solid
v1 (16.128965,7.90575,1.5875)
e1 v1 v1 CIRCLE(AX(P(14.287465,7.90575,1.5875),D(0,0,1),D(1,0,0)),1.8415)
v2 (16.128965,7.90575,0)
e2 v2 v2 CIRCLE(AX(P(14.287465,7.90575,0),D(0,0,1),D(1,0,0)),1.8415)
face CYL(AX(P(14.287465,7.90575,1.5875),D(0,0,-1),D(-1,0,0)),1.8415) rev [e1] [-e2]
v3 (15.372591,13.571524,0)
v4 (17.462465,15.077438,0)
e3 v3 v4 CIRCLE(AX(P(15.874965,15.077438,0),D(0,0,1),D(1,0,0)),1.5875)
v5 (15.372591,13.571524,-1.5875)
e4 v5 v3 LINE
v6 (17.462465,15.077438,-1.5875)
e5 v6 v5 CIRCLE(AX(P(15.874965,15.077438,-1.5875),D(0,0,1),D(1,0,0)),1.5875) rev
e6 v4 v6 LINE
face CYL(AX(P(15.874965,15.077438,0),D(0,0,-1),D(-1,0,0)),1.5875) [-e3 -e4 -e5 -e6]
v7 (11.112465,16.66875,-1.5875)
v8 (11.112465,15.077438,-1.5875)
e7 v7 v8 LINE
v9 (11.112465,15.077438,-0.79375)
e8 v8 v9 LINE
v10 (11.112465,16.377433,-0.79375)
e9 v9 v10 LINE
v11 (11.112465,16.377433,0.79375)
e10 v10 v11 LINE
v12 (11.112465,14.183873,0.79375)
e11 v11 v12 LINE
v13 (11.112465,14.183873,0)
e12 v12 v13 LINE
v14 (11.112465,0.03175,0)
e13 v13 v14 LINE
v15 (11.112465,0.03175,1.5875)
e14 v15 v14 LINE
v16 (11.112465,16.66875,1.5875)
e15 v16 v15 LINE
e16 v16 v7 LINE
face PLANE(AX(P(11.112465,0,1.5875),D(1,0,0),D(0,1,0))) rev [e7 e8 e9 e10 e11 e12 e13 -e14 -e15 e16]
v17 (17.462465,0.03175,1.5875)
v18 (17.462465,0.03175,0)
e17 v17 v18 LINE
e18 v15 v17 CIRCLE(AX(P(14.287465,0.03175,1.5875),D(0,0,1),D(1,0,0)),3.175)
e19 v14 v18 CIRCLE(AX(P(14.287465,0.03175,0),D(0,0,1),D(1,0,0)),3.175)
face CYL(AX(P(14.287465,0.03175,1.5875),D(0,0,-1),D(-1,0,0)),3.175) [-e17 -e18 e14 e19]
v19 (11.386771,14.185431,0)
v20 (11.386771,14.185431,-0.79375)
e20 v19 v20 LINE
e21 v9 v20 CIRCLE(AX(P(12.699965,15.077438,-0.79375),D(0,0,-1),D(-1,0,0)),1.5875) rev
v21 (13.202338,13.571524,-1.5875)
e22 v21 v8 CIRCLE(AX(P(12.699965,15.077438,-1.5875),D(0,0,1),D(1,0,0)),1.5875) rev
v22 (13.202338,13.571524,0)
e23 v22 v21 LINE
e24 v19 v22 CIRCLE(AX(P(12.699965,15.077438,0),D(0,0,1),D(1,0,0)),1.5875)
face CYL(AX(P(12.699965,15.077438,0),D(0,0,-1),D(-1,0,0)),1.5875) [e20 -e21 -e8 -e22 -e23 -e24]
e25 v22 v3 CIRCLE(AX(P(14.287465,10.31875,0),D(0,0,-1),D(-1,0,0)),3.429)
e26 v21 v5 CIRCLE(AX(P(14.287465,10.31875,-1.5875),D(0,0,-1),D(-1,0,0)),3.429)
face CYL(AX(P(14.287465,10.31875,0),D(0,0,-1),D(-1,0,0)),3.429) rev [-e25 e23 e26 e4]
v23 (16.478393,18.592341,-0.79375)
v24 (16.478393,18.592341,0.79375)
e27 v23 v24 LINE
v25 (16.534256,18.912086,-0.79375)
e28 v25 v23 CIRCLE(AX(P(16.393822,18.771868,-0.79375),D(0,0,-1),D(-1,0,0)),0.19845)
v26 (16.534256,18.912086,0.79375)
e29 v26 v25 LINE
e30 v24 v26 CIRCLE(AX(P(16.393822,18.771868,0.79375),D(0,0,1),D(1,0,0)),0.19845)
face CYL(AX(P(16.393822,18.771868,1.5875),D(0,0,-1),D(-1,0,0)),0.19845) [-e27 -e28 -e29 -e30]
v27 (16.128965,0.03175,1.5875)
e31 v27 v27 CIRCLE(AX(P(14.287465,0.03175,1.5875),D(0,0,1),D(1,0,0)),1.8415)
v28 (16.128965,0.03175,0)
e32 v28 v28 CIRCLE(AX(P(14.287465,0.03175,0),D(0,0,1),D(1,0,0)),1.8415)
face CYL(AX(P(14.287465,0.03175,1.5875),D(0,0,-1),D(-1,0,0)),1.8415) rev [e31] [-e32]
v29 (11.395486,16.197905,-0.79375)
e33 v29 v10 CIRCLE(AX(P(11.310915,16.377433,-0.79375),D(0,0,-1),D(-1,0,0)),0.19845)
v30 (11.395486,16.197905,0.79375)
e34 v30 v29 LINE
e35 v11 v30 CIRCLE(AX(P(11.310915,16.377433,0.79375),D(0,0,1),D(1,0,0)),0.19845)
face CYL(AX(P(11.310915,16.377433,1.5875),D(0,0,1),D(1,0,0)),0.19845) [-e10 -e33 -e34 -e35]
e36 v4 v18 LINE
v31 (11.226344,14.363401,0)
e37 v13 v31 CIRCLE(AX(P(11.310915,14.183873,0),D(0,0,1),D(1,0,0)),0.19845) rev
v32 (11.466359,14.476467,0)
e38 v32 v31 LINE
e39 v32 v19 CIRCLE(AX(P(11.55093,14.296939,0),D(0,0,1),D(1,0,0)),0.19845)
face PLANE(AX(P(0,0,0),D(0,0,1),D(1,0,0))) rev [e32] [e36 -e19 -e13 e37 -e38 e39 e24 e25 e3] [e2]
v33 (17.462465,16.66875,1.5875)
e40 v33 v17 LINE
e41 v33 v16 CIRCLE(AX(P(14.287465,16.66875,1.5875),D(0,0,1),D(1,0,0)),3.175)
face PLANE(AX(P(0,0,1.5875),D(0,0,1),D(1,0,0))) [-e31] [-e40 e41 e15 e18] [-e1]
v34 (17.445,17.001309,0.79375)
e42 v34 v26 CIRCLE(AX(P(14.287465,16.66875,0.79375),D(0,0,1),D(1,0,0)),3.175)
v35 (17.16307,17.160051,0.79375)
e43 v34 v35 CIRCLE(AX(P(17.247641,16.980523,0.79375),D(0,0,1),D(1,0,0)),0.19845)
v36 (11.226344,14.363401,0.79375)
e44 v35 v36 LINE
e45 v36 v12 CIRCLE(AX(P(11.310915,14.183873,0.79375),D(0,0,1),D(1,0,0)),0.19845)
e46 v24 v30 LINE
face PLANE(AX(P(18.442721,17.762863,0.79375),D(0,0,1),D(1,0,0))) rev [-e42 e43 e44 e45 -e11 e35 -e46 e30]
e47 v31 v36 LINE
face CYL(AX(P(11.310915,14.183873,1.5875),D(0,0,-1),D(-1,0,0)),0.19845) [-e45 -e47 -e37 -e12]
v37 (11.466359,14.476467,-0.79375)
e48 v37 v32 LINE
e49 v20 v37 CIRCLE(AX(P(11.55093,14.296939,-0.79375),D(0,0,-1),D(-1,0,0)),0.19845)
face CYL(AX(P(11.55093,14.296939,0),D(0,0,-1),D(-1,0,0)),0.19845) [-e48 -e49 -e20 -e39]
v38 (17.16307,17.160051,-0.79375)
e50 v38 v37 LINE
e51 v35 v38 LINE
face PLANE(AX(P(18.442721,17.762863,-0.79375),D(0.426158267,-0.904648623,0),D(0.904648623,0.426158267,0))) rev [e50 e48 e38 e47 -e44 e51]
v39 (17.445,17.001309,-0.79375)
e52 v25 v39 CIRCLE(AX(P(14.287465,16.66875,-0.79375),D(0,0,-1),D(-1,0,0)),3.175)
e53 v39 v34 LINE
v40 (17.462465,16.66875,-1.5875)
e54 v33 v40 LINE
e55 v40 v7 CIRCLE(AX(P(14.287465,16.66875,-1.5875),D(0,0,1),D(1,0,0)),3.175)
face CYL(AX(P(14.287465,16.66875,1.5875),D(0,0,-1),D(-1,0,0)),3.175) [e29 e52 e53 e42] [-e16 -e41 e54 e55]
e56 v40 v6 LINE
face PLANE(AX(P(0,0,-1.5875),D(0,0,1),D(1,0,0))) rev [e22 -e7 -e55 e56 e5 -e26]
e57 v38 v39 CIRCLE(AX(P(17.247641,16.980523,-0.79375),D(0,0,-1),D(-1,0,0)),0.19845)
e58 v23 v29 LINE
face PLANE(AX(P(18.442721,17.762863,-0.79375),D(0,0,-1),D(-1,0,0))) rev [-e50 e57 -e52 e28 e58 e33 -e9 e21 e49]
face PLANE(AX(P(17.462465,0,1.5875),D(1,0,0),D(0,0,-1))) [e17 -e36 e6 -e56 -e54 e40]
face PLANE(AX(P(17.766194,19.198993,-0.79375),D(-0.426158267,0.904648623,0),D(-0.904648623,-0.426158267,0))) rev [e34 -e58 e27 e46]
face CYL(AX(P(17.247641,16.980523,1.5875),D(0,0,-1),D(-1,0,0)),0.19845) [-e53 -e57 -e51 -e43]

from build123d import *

# Parameters (mm, degrees)
SKETCH3_R               = 1.8414999999999992
SKETCH3_R_2             = 1.8415000000000015
BOSS_EXTRUDE1_DEPTH     = 1.5875
BOSS_EXTRUDE2_START     = -1.5875
SKETCH3_3_R             = 3.1750000000000016
BOSS_EXTRUDE2_DEPTH     = 1.5875
CUT_EXTRUDE1_DEPTH      = 1.5875
CUT_EXTRUDE3_DEPTH      = 14.458066723062892
CUT_EXTRUDE3_DEPTH_BACK = 14.458066723062892
SKETCH9_W               = 1.5874999999999995
SKETCH9_H               = 1.5875000000000021
FILLET1_R               = 1.5875
FILLET3_R               = 0.19845020000000002


with BuildPart() as part:
    # Sketch3 → Boss-Extrude1 (new body)
    with BuildSketch(Plane.XY):
        with BuildLine():
            ThreePointArc((11.11246472217867, 0.03175000000000093), (14.287464722178669, -3.1432499999999988), (17.46246472217867, 0.03174999999999976))
            Line((17.46246472217867, 0.03175000000000054), (17.46246472217867, 16.668750000000003))
            ThreePointArc((17.46246472217867, 16.668750000000003), (14.287464722178667, 19.843750000000004), (11.112464722178665, 16.668750000000003))
            Line((11.112464722178666, 16.668750000000003), (11.11246472217867, 0.03174999999999883))
        make_face()
        with Locations((14.287464722178665, 7.905750000000001)):
            Circle(SKETCH3_R, mode=Mode.SUBTRACT)
        with Locations((14.287464722178669, 0.03175000000000054)):
            Circle(SKETCH3_R_2, mode=Mode.SUBTRACT)
    extrude(amount=BOSS_EXTRUDE1_DEPTH)

    # Sketch3<3> → Boss-Extrude2 (add)
    with BuildSketch(Plane.XY.offset(BOSS_EXTRUDE2_START)):
        with BuildLine():
            Line((14.287464727919362, 13.493750000000004), (17.46246472217867, 13.493750000000004))
            Line((17.46246472217867, 13.493750000000004), (17.46246472217867, 16.668750000000003))
            ThreePointArc((17.46246472217867, 16.668750000000003), (16.5325287544756, 14.423685971762355), (14.287464727919362, 13.493750000000002))
        make_face()
        with BuildLine():
            Line((11.11246472217867, 13.493750000000004), (14.287464727919362, 13.493750000000004))
            ThreePointArc((14.287464727919362, 13.493750000000002), (12.042400693941019, 14.423685967703072), (11.112464722178665, 16.668750000000003))
            Line((11.112464722178666, 16.668750000000003), (11.11246472217867, 13.493750000000004))
        make_face()
        with Locations((14.287464722178667, 16.668750000000003)):
            Circle(SKETCH3_3_R)
        with BuildLine():
            ThreePointArc((11.112464722178665, 10.318750009292732), (12.042400697226496, 12.56381403558241), (14.287464727919362, 13.493750000000002))
            Line((14.287464727919362, 13.493750000000004), (11.11246472217867, 13.493750000000004))
            Line((11.11246472217867, 13.493750000000004), (11.11246472217867, 10.318750009292732))
        make_face()
        with BuildLine():
            ThreePointArc((14.287464727919362, 13.493750000000002), (16.532528754475596, 12.563814028237648), (17.462464722178666, 10.318750000000003))
            Line((17.46246472217867, 10.318750000000003), (17.46246472217867, 13.493750000000004))
            Line((17.46246472217867, 13.493750000000004), (14.287464727919362, 13.493750000000004))
        make_face()
    extrude(amount=BOSS_EXTRUDE2_DEPTH)

    # Sketch4 → Cut-Extrude1 (cut)
    with BuildSketch(Plane(origin=(0, 0, -1.5875), x_dir=(-1, 0, 0), z_dir=(0, 0, -1))):
        with BuildLine():
            ThreePointArc((-11.366464722178668, 12.114801224213839), (-14.28746472217867, 13.747750000000003), (-17.208464722178668, 12.11480122421383))
            ThreePointArc((-17.208464722178668, 12.11480122421383), (-17.345736990888724, 11.869560023967814), (-17.4624647221787, 11.613900956452488))
            Line((-17.46246472217867, 11.613900956452483), (-17.46246472217867, 10.318750000000003))
            ThreePointArc((-17.46246472217867, 10.318750000000005), (-14.287464722178669, 13.493750000000002), (-11.112464722178668, 10.318750000000003))
            Line((-11.112464722178666, 10.318750000000003), (-11.112464722178666, 11.613900956452593))
            ThreePointArc((-11.112464722178673, 11.613900956452591), (-11.229192453468636, 11.86956002396787), (-11.366464722178668, 12.114801224213839))
        make_face()
        with BuildLine():
            Line((-17.46246472217867, 10.318750000000003), (-17.46246472217867, 11.613900956452483))
            ThreePointArc((-17.4624647221787, 11.613900956452488), (-14.947376079862362, 6.9538491099290844), (-10.858464722178665, 10.318750000000003))
            ThreePointArc((-10.858464722178665, 10.318750000000003), (-10.922563832107757, 10.978661357683757), (-11.112464722178673, 11.613900956452591))
            Line((-11.112464722178666, 11.613900956452593), (-11.112464722178666, 10.318750000000003))
            ThreePointArc((-11.112464722178668, 10.318750000000003), (-14.287464722178669, 13.493750000000002), (-17.46246472217867, 10.318750000000005))
        make_face()
    extrude(amount=-CUT_EXTRUDE1_DEPTH, mode=Mode.SUBTRACT)

    # Sketch9 → Cut-Extrude3 (cut, two sides: drawn at the far end of the back side and taken through both)
    with BuildSketch(Plane(origin=(14.949330355898779, 7.042270953374606, 0), x_dir=(0, 0, 1), z_dir=(-0.9046486230783365, -0.42615826726988393, 0)).offset(-CUT_EXTRUDE3_DEPTH_BACK)):
        with Locations((-1.1e-16, 9.003381908558007)):
            Rectangle(SKETCH9_W, SKETCH9_H)
    extrude(amount=CUT_EXTRUDE3_DEPTH + CUT_EXTRUDE3_DEPTH_BACK, mode=Mode.SUBTRACT)

    # Fillet1
    # the kernel refuses this fillet: 1.5875 mm, written as the material it takes off along each edge
    with BuildSketch(Plane(origin=(11.112464722178668, 11.613900956452579, 0), x_dir=(-5.1e-16, 1, 0), z_dir=(0, 0, -1))) as fillet1_piece_1:
        with BuildLine():
            CenterArc((3.463537518327043, 1.5875000000000004), FILLET1_R, 161.5512847696779, 108.44871523032214)
            ThreePointArc((1.9576234440297167, 2.0898734177215426), (1.2074075320922062, 0.8308067461464439), (0, 0))
            Line((0, 0), (3.463537518327044, 0))
        make_face()
    extrude(amount=10.24634379581761, mode=Mode.SUBTRACT)
    with BuildSketch(Plane(origin=(17.46246472217867, 11.613900956453127, 0), x_dir=(0, 1, 0), z_dir=(0, 0, -1))) as fillet1_piece_2:
        with BuildLine():
            CenterArc((3.4635375183265698, -1.5875000000000004), FILLET1_R, 90, 108.44871523031935)
            ThreePointArc((1.9576234440292186, -2.0898734177214706), (1.2074075320919153, -0.8308067461464965), (0, 0))
            Line((0, 0), (3.4635375183265698, 0))
        make_face()
    extrude(amount=10.246343795816424, mode=Mode.SUBTRACT)

    # Fillet3
    fillet3_edges = [part.edges().sort_by_distance(p)[0] for p in [
        (16.72182330744723, 18.70701477139974, -1.1e-16),
        (17.404301856828425, 17.273689068062478, -1.1e-16),
        (11.112464722178666, 14.309755511050398, 0.3968749999999998),
        (11.112464722178666, 16.064580488949616, -1.1e-16),
        (11.271579474224783, 14.38471065418466, -0.3968749999999999),
    ]]
    fillet(fillet3_edges, radius=FILLET3_R)


solid = part.part
